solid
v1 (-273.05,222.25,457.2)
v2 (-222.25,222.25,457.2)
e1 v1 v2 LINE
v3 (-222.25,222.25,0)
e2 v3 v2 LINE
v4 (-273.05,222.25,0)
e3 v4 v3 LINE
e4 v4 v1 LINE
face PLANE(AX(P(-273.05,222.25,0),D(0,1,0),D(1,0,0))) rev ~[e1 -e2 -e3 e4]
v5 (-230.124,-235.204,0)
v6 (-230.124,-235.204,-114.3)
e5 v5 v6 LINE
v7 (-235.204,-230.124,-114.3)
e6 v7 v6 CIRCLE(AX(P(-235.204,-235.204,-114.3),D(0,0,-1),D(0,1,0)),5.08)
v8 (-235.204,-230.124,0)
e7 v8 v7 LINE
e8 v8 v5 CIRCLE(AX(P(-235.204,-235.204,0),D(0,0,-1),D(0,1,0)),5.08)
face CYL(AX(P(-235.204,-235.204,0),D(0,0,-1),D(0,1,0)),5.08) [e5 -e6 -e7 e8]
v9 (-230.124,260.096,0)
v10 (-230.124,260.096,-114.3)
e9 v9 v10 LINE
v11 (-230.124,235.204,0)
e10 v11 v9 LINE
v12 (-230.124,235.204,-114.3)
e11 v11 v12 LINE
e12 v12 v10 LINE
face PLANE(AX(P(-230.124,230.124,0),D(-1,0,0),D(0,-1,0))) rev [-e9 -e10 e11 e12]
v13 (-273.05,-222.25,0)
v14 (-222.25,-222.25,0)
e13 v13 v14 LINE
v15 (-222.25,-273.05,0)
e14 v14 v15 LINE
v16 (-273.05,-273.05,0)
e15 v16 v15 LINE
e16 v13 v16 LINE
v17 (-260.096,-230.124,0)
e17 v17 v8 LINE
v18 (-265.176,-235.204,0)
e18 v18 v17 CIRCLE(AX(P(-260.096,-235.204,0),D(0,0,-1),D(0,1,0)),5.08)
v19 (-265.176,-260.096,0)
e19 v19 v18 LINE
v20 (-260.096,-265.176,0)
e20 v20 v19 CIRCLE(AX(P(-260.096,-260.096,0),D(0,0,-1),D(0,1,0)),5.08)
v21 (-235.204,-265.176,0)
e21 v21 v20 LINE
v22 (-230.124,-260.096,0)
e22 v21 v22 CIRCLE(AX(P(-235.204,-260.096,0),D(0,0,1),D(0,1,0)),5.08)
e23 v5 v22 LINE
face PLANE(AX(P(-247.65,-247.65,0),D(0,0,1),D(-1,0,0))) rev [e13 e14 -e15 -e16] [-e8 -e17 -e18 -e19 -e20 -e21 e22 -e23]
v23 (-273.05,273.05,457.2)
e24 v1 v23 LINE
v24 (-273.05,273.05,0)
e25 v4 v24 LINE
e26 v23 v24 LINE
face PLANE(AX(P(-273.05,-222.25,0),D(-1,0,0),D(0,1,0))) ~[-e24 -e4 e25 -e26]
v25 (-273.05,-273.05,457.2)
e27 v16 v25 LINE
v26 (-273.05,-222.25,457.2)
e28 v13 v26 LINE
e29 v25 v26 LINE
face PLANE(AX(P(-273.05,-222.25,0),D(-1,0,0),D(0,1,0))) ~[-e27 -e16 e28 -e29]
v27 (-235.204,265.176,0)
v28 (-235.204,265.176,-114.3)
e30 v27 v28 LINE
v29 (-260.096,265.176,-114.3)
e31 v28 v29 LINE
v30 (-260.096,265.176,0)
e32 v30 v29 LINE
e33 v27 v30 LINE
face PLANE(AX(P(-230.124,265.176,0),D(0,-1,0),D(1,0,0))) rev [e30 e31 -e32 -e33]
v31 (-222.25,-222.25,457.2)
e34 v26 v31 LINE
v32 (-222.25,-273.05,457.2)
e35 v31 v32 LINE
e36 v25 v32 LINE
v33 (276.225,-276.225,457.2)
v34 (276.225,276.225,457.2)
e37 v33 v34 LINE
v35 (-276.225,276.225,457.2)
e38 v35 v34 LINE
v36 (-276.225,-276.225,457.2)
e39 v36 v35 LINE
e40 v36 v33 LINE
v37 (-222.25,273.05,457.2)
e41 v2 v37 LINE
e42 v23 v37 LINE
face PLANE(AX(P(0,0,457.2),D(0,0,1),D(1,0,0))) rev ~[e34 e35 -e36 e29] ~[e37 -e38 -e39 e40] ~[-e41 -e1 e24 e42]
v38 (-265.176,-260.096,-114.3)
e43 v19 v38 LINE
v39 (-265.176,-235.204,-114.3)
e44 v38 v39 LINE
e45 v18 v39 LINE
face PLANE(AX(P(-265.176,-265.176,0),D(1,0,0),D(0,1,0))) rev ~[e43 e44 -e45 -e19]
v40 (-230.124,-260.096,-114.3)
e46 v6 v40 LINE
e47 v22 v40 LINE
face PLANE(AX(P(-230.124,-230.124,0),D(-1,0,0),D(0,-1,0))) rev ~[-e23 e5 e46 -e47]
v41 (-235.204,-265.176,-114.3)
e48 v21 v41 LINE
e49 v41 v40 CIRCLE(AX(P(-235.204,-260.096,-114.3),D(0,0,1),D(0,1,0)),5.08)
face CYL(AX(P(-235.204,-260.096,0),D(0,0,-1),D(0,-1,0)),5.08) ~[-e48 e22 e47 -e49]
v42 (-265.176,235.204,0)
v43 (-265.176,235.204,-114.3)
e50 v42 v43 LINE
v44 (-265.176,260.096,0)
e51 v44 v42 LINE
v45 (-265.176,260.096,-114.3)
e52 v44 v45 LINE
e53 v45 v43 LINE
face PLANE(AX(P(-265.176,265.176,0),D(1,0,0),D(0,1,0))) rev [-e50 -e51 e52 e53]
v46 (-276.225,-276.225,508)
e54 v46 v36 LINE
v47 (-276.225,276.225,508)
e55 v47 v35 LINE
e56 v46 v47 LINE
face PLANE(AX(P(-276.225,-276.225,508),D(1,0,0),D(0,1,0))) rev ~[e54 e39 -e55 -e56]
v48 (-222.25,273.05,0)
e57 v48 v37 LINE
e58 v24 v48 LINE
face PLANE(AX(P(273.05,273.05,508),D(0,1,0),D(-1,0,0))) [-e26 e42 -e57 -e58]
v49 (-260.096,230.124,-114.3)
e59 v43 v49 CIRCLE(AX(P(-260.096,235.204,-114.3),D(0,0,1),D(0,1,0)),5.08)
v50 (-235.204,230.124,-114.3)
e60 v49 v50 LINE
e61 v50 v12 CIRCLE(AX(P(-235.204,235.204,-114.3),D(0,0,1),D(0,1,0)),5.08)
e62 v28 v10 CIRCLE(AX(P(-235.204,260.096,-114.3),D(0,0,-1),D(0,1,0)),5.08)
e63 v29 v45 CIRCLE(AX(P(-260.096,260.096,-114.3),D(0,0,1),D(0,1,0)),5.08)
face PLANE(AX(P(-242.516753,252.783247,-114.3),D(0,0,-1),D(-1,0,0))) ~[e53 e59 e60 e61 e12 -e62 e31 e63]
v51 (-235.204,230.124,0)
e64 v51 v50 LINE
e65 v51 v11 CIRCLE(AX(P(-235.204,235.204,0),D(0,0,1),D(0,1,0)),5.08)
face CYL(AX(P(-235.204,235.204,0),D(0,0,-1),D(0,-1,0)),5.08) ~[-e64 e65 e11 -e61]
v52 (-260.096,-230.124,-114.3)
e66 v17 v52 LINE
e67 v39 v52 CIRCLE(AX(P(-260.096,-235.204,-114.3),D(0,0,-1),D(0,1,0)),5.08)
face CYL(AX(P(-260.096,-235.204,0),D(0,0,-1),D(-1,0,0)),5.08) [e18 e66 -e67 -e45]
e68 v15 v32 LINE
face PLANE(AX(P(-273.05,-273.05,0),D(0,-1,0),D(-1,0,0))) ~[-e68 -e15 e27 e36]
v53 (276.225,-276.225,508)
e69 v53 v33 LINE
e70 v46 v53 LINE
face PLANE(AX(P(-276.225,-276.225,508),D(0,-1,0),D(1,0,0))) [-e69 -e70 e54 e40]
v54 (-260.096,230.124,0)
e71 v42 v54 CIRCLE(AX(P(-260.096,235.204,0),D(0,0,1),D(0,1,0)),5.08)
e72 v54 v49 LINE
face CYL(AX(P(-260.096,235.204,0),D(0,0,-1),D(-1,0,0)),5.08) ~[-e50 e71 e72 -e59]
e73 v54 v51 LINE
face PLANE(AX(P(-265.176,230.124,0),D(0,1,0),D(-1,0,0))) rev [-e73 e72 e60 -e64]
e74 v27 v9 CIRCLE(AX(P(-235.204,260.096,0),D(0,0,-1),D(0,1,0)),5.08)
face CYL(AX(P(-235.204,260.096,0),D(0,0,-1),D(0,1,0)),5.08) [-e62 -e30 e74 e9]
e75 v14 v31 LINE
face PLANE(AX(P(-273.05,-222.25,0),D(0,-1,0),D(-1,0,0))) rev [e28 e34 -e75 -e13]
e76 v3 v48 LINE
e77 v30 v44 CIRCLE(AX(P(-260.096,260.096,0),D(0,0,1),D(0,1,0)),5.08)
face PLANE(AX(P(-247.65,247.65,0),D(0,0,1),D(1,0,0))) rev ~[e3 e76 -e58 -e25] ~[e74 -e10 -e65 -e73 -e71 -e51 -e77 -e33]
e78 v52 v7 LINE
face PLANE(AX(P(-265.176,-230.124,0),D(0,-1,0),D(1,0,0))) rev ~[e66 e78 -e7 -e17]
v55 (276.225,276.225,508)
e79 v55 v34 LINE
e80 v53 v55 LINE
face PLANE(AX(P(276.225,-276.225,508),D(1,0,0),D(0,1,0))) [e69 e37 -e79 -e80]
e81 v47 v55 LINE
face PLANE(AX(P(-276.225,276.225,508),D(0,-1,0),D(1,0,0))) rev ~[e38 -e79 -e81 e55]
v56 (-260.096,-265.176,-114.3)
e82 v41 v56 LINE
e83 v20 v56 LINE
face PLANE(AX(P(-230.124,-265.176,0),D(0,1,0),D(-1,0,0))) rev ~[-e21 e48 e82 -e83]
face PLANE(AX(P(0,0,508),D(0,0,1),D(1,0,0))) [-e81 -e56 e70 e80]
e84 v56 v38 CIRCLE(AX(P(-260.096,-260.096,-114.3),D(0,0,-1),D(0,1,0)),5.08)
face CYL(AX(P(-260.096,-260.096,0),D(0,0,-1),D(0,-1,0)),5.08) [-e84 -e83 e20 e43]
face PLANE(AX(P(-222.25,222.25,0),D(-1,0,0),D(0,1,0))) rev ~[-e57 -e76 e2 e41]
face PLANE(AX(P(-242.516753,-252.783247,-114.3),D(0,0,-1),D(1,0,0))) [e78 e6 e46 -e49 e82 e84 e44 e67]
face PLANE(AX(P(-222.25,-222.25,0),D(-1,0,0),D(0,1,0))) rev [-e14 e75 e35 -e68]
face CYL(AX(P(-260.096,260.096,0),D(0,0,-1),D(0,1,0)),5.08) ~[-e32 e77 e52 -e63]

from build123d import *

# Parameters (mm, degrees)
F1_W      = 50.8
F1_H      = 50.8
F2_DEPTH  = 508
F5_W      = 50.8
F5_H      = 50.8
F6_DEPTH  = 50.8
F8_W      = 552.45
F8_H      = 552.45
F8_W_2    = 546.1
F8_H_2    = 546.1
F9_DEPTH  = 50.8
F10_DEPTH = 457.2
F12_DEPTH = 114.3
F13_R     = 5.08


# Not quite as in the source:
# - a pattern or mirror of a feature is missing from the dataset's text; its kind, count and spacing are read off the source's solid


with BuildPart() as f2:
    # F1 (on Top) → F2 (new body)
    with BuildSketch(Plane.XY):
        with Locations((-247.65, 247.65)):
            Rectangle(F1_W, F1_H)
    extrude(amount=F2_DEPTH)


with BuildPart() as f3_1:
    # F3: instance of F2
    add(f2.part.mirror(Plane.YZ))


with BuildPart() as f4_1:
    # F4: instance of F2
    add(f2.part.mirror(Plane.XZ))


with BuildPart() as f4_2:
    # F4: instance of F3_1
    add(f3_1.part.mirror(Plane.XZ))


with BuildPart() as f2_1:
    add(f2.part)

    add(f3_1.part)  # F6 merges F3_1

    add(f4_1.part)  # F6 merges F4_1

    add(f4_2.part)  # F6 merges F4_2
    # F5 (on face) → F6 (join)
    with BuildSketch(Plane.XY.offset(508)):
        Polygon((-273.05, 222.25), (-273.05, -273.05), (273.05, -273.05), (273.05, 273.05), (-222.25, 273.05), (-222.25, 222.25), align=None)
        with Locations((-247.65, 247.65)):
            Rectangle(F5_W, F5_H)
    extrude(amount=-F6_DEPTH)

    # F7: union 

    # F8 (on face) → F9 (join, through all)
    with BuildSketch(Plane.XY.offset(508)):
        Rectangle(F8_W, F8_H)
        Rectangle(F8_W_2, F8_H_2, mode=Mode.SUBTRACT)
    extrude(amount=-F9_DEPTH)

    # F10 (cut, through all): faces of the model
    f10_faces = [f2_1.faces().sort_by_distance(p)[0] for p in [
        (247.65, -247.65, 0),
        (247.65, 247.65, 0),
    ]]
    extrude(f10_faces, amount=-F10_DEPTH, mode=Mode.SUBTRACT)

    # F11 (on face) → F12 (join)
    with BuildSketch(Plane(origin=(0, 0, 0), x_dir=(1, 0, 0), z_dir=(0, 0, -1))):
        Polygon((-230.124, 265.176), (-265.176, 265.176), (-230.124, 230.124), align=None)
        Polygon((-230.124, 230.124), (-265.176, 265.176), (-265.176, 230.124), align=None)
    f12 = extrude(amount=F12_DEPTH)

    # F12_copies: F12 across plane
    add(f12.mirror(Plane.ZX))

    # F13
    f13_edges = [f2_1.edges().sort_by_distance(p)[0] for p in [
        (-230.124, -265.176, -57.15),
        (-265.176, -265.176, -57.15),
        (-230.124, -230.124, -57.15),
        (-265.176, -230.124, -57.15),
        (-230.124, 265.176, -57.15),
        (-265.176, 265.176, -57.15),
        (-265.176, 230.124, -57.15),
        (-230.124, 230.124, -57.15),
    ]]
    fillet(f13_edges, radius=F13_R)


solid = f2_1.part
